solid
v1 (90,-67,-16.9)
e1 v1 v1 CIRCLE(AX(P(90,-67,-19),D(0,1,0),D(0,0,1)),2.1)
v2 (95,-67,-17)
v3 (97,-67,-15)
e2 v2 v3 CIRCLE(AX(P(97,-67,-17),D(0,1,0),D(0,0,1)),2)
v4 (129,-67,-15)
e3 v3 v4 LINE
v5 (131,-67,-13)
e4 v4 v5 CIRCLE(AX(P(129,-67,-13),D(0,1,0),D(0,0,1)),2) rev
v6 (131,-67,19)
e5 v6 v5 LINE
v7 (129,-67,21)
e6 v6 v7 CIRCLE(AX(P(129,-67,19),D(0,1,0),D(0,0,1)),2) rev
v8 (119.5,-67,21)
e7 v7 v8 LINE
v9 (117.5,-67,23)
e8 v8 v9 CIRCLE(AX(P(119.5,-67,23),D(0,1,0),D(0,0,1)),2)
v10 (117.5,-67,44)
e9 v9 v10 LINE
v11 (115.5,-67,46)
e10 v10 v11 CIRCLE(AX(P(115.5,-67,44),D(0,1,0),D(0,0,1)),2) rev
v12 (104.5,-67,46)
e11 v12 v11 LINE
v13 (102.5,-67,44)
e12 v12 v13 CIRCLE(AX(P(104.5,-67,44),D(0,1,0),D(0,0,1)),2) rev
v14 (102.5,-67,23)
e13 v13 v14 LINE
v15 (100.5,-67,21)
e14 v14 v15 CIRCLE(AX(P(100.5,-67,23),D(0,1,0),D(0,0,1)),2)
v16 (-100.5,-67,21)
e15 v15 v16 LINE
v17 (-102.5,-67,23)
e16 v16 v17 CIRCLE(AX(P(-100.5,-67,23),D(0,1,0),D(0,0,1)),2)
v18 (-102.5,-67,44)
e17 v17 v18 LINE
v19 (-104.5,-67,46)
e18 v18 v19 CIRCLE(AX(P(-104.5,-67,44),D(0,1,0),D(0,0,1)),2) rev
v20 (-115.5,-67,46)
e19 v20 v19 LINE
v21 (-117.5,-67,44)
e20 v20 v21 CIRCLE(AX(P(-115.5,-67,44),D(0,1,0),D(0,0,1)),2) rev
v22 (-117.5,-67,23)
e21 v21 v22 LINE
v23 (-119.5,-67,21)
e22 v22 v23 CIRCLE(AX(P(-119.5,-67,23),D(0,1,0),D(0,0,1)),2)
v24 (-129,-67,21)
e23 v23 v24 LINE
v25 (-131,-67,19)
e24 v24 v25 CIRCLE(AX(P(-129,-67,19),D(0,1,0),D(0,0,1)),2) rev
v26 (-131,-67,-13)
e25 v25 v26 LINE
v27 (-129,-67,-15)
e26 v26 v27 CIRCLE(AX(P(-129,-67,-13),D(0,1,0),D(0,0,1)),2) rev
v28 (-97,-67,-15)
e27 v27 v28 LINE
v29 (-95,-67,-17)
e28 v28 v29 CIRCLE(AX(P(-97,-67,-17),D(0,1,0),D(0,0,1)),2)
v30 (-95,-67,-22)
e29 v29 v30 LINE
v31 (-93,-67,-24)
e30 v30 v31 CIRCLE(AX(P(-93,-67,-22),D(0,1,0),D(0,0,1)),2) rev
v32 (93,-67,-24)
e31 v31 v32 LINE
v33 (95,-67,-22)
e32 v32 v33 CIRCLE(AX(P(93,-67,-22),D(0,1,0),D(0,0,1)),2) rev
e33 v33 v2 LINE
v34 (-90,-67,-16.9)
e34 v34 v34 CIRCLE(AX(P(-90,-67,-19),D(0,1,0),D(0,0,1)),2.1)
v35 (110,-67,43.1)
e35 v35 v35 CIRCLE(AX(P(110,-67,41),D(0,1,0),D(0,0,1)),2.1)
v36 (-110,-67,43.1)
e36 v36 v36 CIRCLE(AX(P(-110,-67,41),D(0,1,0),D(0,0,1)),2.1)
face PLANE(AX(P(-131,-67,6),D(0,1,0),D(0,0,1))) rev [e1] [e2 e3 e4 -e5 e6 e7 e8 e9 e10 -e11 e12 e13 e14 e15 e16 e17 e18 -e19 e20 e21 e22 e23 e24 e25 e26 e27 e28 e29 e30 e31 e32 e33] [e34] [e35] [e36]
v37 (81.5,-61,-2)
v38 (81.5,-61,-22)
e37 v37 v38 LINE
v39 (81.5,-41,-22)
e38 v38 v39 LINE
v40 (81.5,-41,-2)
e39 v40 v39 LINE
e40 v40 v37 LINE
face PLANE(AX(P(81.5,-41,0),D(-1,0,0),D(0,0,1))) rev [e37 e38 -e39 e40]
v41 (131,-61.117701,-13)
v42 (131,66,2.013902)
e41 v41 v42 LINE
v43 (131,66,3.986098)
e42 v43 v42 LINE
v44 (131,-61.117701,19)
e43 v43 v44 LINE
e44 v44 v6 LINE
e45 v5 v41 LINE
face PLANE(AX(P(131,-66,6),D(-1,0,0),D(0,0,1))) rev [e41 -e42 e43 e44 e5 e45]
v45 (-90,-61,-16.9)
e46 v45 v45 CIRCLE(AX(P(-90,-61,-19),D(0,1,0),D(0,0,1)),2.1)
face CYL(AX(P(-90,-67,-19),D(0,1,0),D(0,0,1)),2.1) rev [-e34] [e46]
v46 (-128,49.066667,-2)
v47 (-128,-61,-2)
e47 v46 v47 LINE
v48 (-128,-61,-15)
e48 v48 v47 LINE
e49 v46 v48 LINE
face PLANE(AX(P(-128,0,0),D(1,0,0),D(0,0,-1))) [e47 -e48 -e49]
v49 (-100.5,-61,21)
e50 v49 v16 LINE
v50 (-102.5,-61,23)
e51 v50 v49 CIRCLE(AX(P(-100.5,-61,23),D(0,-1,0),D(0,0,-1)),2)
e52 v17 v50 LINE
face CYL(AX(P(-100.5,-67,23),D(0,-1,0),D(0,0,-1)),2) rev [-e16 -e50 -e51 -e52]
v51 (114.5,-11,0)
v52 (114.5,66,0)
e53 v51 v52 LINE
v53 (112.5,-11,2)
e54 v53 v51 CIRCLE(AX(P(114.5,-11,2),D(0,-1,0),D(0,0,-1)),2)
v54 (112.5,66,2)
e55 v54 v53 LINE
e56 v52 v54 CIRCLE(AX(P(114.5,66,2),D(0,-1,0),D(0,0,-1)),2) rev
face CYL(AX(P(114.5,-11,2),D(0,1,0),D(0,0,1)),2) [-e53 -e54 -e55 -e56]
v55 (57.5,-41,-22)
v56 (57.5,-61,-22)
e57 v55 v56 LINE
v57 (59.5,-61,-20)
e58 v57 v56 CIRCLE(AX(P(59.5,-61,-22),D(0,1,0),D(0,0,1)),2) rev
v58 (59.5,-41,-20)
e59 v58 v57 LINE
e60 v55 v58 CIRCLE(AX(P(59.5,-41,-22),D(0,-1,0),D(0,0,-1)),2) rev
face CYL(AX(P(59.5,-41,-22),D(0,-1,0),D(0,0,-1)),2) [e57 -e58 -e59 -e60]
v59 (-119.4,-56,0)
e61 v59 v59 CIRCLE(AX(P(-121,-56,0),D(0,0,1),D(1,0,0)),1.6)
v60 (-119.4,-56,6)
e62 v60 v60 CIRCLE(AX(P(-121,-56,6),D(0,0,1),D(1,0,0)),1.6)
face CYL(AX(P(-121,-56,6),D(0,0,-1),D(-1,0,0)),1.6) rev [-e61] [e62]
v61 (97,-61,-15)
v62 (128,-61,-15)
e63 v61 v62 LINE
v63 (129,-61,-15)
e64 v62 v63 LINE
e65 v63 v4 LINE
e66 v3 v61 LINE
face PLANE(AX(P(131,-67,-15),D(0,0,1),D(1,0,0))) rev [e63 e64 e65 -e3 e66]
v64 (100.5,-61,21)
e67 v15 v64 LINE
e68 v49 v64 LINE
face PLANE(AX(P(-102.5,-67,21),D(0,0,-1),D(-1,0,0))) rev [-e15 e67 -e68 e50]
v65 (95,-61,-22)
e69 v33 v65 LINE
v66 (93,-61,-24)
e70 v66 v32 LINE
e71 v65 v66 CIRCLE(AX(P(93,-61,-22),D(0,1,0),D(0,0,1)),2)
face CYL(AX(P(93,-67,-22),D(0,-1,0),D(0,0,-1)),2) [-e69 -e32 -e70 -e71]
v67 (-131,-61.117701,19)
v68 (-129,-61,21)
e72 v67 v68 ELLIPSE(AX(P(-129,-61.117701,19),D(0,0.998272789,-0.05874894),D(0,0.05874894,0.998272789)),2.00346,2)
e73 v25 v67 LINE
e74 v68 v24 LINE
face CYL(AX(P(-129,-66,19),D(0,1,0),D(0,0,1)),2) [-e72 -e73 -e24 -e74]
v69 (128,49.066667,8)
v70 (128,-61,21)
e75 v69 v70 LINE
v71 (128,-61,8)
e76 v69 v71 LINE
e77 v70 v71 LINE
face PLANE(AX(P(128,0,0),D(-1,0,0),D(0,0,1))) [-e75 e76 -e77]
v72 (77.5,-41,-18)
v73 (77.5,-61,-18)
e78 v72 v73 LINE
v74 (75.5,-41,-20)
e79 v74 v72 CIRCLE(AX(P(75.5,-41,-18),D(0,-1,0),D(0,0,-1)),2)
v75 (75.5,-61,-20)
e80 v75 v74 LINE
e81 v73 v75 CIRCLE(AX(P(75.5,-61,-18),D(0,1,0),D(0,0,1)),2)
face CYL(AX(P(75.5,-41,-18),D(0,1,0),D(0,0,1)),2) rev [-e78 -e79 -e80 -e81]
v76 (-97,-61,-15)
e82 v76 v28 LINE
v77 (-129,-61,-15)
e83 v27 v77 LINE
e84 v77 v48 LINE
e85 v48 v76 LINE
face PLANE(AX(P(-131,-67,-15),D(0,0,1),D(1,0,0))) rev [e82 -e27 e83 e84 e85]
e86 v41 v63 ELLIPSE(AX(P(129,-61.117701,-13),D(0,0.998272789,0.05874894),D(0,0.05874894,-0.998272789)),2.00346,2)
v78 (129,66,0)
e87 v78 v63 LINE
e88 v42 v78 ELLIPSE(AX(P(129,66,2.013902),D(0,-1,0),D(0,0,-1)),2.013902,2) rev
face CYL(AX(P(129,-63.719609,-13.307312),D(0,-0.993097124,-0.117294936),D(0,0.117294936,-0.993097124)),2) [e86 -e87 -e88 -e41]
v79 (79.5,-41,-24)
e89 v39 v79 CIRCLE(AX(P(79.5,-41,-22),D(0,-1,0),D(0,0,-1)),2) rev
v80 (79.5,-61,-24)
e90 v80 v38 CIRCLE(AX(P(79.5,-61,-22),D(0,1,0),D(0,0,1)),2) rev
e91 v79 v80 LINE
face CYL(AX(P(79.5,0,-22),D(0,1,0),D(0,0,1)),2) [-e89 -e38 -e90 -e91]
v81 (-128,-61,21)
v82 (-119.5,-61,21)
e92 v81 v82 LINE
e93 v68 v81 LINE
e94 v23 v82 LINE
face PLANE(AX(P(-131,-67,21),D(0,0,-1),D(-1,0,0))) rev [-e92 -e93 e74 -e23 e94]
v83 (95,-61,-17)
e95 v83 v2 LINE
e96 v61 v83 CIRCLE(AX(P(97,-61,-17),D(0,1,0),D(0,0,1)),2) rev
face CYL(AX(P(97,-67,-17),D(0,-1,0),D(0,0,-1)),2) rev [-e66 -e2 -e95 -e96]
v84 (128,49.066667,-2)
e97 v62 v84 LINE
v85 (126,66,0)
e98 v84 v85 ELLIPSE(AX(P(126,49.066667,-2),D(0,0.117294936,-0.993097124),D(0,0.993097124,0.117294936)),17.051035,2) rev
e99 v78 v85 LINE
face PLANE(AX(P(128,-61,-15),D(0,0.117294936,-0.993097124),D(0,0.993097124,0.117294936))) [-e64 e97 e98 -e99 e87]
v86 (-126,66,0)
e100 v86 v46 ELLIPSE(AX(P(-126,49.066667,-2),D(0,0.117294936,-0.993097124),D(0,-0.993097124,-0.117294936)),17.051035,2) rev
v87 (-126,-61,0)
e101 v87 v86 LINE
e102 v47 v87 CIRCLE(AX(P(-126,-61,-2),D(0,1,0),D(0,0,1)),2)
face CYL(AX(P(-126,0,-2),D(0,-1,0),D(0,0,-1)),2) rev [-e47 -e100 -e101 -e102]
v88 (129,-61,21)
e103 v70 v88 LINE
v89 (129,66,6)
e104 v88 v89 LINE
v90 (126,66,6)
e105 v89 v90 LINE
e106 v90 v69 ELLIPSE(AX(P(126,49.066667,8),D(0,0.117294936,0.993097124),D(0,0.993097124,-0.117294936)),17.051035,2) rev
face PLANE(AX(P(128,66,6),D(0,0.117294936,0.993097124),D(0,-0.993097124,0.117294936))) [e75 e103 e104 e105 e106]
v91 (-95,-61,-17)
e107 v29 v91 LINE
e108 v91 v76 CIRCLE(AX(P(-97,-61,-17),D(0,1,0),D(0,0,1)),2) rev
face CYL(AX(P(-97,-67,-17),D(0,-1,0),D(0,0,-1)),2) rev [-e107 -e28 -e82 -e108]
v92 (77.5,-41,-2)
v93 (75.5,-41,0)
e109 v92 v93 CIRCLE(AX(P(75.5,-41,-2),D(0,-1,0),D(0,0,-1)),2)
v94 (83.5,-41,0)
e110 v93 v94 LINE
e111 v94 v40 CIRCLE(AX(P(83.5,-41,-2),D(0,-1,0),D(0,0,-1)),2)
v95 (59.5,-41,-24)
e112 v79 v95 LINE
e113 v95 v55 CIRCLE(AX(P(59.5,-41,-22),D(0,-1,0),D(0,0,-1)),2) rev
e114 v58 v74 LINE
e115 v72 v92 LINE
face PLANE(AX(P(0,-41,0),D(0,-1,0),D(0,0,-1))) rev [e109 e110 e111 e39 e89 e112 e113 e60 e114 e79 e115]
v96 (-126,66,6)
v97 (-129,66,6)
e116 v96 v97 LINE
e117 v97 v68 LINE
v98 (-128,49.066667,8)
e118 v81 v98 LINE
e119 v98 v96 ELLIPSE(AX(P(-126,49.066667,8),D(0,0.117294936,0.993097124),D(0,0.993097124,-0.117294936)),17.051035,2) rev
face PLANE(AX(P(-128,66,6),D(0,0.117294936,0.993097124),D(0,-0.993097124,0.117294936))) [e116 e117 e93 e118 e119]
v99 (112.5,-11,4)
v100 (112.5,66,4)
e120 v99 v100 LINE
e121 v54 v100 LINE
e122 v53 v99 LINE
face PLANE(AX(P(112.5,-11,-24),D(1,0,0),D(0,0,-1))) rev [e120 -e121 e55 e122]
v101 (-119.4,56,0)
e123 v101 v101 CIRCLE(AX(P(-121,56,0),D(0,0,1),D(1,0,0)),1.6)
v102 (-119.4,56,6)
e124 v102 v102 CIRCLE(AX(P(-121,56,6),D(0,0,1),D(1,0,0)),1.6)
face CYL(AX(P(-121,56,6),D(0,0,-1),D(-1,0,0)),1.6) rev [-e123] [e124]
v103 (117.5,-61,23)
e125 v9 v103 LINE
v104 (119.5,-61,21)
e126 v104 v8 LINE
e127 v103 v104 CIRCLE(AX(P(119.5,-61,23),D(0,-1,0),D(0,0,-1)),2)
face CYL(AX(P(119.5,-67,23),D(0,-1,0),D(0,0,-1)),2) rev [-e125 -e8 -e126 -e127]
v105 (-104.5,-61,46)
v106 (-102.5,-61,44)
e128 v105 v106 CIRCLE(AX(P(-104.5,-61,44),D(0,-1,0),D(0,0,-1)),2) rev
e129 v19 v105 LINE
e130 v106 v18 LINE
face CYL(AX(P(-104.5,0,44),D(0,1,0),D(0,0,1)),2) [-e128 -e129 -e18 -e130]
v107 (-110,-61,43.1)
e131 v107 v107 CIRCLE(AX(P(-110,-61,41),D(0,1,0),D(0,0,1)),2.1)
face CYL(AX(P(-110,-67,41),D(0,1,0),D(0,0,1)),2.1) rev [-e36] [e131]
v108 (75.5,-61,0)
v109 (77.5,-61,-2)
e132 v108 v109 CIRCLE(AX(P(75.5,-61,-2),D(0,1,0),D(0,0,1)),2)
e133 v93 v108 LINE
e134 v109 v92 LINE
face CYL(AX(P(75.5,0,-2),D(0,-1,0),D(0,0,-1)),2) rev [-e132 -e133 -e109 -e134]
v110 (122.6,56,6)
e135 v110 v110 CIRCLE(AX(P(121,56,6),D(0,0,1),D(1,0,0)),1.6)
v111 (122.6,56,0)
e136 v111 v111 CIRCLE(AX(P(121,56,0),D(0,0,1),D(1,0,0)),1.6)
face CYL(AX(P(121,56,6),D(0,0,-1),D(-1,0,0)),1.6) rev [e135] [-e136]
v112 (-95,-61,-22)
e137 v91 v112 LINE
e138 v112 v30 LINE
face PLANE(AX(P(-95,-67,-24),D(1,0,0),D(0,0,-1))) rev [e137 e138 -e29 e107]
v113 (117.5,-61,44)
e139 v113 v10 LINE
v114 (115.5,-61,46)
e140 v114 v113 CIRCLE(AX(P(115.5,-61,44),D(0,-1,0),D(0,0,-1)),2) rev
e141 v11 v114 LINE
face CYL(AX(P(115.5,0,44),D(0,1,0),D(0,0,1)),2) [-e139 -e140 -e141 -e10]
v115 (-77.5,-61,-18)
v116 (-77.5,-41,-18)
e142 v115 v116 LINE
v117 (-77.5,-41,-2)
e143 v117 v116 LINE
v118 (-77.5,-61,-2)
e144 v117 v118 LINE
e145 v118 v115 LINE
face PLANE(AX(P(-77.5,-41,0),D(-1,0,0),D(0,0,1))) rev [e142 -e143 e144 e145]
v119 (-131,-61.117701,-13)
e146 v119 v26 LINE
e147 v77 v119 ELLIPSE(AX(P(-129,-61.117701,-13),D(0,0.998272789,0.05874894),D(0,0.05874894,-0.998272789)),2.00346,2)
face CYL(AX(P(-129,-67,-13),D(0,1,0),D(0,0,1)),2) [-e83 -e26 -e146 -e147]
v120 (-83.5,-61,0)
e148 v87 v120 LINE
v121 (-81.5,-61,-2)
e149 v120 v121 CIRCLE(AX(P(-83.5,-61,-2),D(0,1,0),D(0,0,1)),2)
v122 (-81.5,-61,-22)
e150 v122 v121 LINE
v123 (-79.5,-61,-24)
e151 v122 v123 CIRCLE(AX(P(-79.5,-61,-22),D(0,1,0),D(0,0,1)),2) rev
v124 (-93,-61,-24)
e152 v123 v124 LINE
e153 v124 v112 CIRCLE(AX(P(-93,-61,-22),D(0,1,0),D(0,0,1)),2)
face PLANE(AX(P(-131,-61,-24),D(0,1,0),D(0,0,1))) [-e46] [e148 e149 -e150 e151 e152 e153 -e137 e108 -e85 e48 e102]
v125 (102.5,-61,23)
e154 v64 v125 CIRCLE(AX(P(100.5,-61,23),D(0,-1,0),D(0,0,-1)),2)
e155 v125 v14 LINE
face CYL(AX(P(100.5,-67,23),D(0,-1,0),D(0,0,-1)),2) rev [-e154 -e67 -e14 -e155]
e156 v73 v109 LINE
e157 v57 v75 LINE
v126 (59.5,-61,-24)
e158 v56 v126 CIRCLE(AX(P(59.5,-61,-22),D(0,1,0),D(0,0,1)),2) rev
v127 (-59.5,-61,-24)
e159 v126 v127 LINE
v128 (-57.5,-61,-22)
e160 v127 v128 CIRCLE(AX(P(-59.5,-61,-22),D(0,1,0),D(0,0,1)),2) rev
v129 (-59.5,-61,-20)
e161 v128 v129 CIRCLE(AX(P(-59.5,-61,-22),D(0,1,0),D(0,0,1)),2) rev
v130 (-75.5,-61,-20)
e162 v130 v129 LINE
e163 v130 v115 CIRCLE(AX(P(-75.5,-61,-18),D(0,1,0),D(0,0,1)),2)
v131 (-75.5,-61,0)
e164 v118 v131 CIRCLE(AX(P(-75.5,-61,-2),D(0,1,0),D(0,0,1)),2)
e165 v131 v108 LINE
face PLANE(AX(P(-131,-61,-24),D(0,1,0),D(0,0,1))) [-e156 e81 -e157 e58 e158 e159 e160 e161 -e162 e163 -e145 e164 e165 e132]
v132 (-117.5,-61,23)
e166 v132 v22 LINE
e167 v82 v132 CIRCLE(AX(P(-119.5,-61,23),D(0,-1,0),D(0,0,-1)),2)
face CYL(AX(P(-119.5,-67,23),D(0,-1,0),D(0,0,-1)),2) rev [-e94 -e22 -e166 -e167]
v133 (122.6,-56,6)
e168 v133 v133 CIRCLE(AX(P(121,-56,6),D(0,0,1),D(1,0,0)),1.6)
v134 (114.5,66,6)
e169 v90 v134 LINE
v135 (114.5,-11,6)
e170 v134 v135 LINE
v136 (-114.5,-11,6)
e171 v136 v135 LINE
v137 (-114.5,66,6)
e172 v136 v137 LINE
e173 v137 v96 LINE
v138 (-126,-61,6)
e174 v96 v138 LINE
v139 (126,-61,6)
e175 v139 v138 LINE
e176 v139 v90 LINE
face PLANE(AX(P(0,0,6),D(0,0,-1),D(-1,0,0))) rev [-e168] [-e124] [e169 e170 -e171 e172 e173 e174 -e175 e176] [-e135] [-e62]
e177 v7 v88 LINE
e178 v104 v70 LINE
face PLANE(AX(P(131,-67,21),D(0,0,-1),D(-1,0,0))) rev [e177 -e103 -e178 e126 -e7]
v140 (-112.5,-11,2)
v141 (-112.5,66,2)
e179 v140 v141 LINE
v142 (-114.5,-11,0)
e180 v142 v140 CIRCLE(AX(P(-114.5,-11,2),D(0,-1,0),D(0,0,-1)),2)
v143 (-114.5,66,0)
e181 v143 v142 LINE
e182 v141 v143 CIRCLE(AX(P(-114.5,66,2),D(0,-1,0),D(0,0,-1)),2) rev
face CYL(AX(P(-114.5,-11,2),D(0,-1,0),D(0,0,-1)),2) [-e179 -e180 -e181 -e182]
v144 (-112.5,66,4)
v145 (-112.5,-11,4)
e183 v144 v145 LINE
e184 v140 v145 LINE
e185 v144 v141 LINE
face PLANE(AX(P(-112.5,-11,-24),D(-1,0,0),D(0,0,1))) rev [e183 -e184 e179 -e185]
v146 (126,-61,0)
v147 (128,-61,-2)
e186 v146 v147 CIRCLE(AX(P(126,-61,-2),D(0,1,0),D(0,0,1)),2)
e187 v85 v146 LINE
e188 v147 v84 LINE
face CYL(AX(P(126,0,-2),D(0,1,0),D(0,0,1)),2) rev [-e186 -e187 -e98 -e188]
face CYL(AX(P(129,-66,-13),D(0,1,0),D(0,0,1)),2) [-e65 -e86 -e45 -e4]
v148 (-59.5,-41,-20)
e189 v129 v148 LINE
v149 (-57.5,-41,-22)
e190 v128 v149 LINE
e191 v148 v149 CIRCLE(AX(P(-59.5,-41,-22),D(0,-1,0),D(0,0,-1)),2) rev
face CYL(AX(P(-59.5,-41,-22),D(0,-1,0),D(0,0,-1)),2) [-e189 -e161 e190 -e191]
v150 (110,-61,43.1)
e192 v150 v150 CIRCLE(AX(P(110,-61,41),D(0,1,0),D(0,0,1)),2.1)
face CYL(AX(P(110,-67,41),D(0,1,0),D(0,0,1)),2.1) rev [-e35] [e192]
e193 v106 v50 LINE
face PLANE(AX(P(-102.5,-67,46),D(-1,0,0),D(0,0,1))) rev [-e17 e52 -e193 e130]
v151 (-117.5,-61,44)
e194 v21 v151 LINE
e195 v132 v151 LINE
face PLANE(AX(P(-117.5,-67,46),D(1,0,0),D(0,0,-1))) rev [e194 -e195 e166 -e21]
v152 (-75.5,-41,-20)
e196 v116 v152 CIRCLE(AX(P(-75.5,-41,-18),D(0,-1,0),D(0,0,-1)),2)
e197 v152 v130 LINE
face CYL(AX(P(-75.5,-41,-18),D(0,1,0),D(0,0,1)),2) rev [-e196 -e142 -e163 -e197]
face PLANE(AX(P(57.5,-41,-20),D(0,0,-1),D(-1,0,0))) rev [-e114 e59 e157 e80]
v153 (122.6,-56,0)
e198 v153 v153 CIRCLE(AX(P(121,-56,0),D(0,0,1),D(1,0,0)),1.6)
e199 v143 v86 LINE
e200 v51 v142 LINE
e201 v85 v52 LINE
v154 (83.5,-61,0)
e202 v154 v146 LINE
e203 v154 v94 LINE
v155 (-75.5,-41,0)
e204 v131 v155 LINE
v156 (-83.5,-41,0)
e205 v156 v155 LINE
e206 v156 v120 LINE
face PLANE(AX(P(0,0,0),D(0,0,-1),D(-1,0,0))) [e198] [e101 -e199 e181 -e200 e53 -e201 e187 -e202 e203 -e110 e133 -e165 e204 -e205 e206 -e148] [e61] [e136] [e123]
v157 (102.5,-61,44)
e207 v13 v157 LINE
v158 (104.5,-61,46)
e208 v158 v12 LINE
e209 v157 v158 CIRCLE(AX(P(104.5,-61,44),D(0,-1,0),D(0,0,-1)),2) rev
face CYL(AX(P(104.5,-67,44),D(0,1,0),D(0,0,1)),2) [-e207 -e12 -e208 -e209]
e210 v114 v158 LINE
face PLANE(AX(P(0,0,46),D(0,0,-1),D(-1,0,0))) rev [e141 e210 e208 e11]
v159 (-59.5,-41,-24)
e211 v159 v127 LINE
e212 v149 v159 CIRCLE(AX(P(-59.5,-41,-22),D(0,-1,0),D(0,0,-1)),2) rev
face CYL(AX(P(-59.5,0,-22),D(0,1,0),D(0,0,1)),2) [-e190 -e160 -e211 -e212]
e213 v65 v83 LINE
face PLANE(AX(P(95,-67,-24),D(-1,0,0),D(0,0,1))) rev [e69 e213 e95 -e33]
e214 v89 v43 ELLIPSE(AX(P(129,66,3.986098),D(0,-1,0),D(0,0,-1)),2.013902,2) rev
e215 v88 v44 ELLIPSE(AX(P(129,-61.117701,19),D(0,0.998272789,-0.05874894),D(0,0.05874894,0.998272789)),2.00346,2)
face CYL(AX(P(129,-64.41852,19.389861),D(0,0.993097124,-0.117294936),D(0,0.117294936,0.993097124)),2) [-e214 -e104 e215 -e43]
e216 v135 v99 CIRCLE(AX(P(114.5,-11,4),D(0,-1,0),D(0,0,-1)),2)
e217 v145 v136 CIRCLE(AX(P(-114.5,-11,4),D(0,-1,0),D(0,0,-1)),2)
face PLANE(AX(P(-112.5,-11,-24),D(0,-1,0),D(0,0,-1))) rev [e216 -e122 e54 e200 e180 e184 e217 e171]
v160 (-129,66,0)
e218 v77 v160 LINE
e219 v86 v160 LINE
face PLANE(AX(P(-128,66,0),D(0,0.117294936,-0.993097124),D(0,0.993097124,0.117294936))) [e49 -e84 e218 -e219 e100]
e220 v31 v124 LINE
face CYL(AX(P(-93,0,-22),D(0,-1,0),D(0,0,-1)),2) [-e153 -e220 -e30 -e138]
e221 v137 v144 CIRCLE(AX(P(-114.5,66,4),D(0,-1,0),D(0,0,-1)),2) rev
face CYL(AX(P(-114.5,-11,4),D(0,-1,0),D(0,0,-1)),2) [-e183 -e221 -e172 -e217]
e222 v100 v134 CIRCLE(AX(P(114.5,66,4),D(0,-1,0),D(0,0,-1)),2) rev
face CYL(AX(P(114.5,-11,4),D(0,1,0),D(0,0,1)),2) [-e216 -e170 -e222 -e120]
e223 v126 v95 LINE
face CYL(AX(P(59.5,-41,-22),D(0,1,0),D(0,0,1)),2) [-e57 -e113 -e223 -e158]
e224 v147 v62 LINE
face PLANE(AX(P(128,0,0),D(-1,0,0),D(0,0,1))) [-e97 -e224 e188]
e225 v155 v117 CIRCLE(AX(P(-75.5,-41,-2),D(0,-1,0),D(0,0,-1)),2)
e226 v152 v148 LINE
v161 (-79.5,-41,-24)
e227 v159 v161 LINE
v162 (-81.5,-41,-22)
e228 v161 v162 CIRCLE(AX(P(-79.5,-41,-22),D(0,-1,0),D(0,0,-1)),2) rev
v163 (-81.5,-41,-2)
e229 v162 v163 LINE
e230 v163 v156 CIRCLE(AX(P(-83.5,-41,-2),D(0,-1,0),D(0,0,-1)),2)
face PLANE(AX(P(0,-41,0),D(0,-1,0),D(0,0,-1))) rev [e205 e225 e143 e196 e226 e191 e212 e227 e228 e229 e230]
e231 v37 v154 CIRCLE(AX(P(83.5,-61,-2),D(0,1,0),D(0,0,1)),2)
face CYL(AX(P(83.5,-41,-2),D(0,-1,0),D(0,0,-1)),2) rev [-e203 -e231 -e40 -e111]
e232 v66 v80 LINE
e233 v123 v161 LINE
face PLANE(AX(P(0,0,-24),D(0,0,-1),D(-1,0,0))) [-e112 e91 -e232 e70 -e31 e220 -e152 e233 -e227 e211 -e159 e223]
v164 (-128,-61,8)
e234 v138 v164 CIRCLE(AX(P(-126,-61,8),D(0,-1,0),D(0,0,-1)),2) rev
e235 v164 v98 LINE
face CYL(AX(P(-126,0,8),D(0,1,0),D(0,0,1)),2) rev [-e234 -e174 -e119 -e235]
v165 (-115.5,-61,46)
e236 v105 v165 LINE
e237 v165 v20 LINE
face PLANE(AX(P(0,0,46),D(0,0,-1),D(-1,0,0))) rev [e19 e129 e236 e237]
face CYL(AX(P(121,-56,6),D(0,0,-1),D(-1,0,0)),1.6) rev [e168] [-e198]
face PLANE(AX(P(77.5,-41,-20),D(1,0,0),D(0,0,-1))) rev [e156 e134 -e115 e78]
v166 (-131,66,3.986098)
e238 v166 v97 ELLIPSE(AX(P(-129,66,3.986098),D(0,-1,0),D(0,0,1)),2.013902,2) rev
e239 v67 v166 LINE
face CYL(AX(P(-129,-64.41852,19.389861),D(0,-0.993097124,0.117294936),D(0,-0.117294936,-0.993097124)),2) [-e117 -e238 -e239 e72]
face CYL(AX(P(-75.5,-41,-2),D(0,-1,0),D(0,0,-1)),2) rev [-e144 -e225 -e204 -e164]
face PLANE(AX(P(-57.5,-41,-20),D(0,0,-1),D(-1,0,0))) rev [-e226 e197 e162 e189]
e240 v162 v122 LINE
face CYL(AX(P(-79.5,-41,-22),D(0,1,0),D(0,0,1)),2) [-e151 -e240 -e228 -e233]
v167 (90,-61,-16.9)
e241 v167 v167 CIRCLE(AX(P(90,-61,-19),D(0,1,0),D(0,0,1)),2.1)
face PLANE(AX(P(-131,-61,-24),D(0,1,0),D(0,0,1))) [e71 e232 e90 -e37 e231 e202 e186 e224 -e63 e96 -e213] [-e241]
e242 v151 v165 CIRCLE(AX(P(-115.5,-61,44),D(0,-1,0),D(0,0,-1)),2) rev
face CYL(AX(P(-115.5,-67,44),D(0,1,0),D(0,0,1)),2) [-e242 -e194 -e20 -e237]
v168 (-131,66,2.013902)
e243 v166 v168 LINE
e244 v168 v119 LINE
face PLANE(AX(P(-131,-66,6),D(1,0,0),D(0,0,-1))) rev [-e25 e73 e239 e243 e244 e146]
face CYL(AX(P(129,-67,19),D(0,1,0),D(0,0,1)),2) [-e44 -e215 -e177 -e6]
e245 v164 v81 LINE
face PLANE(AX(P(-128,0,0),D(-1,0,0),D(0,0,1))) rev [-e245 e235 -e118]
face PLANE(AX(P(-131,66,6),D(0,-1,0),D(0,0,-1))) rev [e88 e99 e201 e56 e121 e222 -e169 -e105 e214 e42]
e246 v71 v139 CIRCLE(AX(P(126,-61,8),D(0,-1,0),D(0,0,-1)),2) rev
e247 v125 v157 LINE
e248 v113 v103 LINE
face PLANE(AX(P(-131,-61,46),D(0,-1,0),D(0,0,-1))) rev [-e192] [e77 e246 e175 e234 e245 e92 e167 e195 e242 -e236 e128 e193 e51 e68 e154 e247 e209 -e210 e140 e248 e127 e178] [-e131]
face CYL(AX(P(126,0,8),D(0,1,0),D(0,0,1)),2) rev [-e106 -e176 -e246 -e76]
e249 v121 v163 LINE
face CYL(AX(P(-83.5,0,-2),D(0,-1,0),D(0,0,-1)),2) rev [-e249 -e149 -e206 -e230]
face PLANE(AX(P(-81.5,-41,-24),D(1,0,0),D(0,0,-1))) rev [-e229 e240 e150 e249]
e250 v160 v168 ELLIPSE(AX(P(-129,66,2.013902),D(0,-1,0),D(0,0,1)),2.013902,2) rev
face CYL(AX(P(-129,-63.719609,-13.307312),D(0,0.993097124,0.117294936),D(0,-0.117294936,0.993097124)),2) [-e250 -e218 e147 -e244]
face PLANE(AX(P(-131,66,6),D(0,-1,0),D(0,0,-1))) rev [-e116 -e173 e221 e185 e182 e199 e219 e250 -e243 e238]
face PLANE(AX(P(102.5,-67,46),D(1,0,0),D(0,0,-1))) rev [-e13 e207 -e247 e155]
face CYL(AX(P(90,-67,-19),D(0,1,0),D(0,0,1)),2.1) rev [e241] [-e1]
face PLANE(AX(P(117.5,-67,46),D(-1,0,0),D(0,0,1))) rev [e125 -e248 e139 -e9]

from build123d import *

# Parameters (mm, degrees)
SKETCH1_R               = 1.6
BOSS_EXTRUDE1_DEPTH     = 6
SKETCH5_W               = 262
SKETCH5_H               = 6
BOSS_EXTRUDE3_DEPTH     = 40
SKETCH5_2_W             = 262
SKETCH5_2_H             = 6
BOSS_EXTRUDE5_DEPTH     = 30
SKETCH3_R               = 2.1
CUT_EXTRUDE1_DEPTH      = 189.164821367
SKETCH6_W               = 225
SKETCH6_H               = 77
CUT_EXTRUDE2_DEPTH      = 153.47950682
BOSS_EXTRUDE7_DEPTH     = 20
CUT_EXTRUDE4_DEPTH      = 189.164821367
CUT_EXTRUDE4_DEPTH_BACK = 189.164821367
SKETCH11_W              = 36
SKETCH11_H              = 9
SKETCH11_W_2            = 13.5
SKETCH11_H_2            = 25
SKETCH11_W_3            = 205
BOSS_EXTRUDE4_DEPTH     = 3
BOSS_EXTRUDE6_DEPTH     = 3
FILLET1_R               = 2


with BuildPart() as part:
    # Sketch1 → Boss-Extrude1 (new body)
    with BuildSketch(Plane.XY):
        Polygon((-131, -66), (-131, 66), (131, 66), (131, -66), (131, -67), (-131, -67), align=None)
        with Locations((-121, 56)):
            Circle(SKETCH1_R, mode=Mode.SUBTRACT)
        with Locations((121, 56)):
            Circle(SKETCH1_R, mode=Mode.SUBTRACT)
        with Locations((121, -56)):
            Circle(SKETCH1_R, mode=Mode.SUBTRACT)
        with Locations((-121, -56)):
            Circle(SKETCH1_R, mode=Mode.SUBTRACT)
    extrude(amount=BOSS_EXTRUDE1_DEPTH)

    # Sketch5 → Boss-Extrude3 (add)
    with BuildSketch(Plane.XY.offset(6)):
        with Locations((0, -64)):
            Rectangle(SKETCH5_W, SKETCH5_H)
    extrude(amount=BOSS_EXTRUDE3_DEPTH)

    # Sketch5<2> → Boss-Extrude5 (add)
    with BuildSketch(Plane.XY.offset(6)):
        with Locations((0, -64)):
            Rectangle(SKETCH5_2_W, SKETCH5_2_H)
    extrude(amount=-BOSS_EXTRUDE5_DEPTH)

    # Sketch3 → Cut-Extrude1 (cut, through all)
    with BuildSketch(Plane(origin=(0, -61, 0), x_dir=(1, 0, 0), z_dir=(0, 1, 0))):
        with Locations(Location((-110, -41, 0), (0, 0, 270))):
            Circle(SKETCH3_R)
        with Locations(Location((110, -41, 0), (0, 0, 270))):
            Circle(SKETCH3_R)
        with Locations(Location((-90, 19, 0), (0, 0, 270))):
            Circle(SKETCH3_R)
        with Locations(Location((90, 19, 0), (0, 0, 270))):
            Circle(SKETCH3_R)
    extrude(amount=-CUT_EXTRUDE1_DEPTH, mode=Mode.SUBTRACT)

    # Sketch6 → Cut-Extrude2 (cut, through all)
    with BuildSketch(Plane.XY.offset(6)):
        with Locations((0, 27.5)):
            Rectangle(SKETCH6_W, SKETCH6_H)
    extrude(amount=-CUT_EXTRUDE2_DEPTH, mode=Mode.SUBTRACT)

    # Sketch9 → Boss-Extrude7 (add)
    with BuildSketch(Plane(origin=(0, -61, 0), x_dir=(1, 0, 0), z_dir=(0, 1, 0))):
        Polygon((-81.5, 24), (-81.5, 0), (-77.5, 0), (-77.5, 20), (-57.5, 20), (-57.5, 24), align=None)
        Polygon((77.5, 20), (77.5, 0), (81.5, 0), (81.5, 24), (57.5, 24), (57.5, 20), align=None)
    extrude(amount=BOSS_EXTRUDE7_DEPTH)

    # Sketch11 → Cut-Extrude4 (cut, two sides: drawn at the far end of the back side and taken through both)
    with BuildSketch(Plane(origin=(0, -61, 0), x_dir=(1, 0, 0), z_dir=(0, 1, 0)).offset(-CUT_EXTRUDE4_DEPTH_BACK)):
        with Locations((-113, 19.5)):
            Rectangle(SKETCH11_W, SKETCH11_H)
        with Locations((113, 19.5)):
            Rectangle(SKETCH11_W, SKETCH11_H)
        with Locations((124.25, -33.5)):
            Rectangle(SKETCH11_W_2, SKETCH11_H_2)
        with Locations((-124.25, -33.5)):
            Rectangle(SKETCH11_W_2, SKETCH11_H_2)
        with Locations((0, -33.5)):
            Rectangle(SKETCH11_W_3, SKETCH11_H_2)
    extrude(amount=CUT_EXTRUDE4_DEPTH + CUT_EXTRUDE4_DEPTH_BACK, mode=Mode.SUBTRACT)

    # Sketch8 → Boss-Extrude4 (add)
    with BuildSketch(Plane(origin=(131, 0, 0), x_dir=(0, 0, -1), z_dir=(1, 0, 0))):
        Polygon((-6, 66), (-21, -61), (-6, -61), align=None)
        Polygon((0, 66), (0, -61), (15, -61), align=None)
    extrude(amount=-BOSS_EXTRUDE4_DEPTH)

    # Sketch7 → Boss-Extrude6 (add)
    with BuildSketch(Plane.ZY.offset(131)):
        Polygon((6, 66), (21, -61), (6, -61), align=None)
        Polygon((0, 66), (-15, -61), (0, -61), align=None)
    extrude(amount=-BOSS_EXTRUDE6_DEPTH)

    # Fillet1
    fillet1_edges = [part.edges().sort_by_distance(p)[0] for p in [
        (128, 2.5, 6),
        (128, 2.5, 0),
        (-128, 2.5, 0),
        (-131, 2.5, -7.5),
        (-131, 2.5, 13.5),
        (-128, 2.5, 6),
        (131, 2.5, -7.5),
        (131, 2.5, 13.5),
        (-112.5, 27.5, 6),
        (-112.5, 27.5, 0),
        (112.5, 27.5, 6),
        (112.5, 27.5, 0),
        (-131, -64, -15),
        (-95, -64, -15),
        (-95, -64, -24),
        (-81.5, -51, 0),
        (81.5, -51, 0),
        (95, -64, -24),
        (95, -64, -15),
        (131, -64, -15),
        (-131, -64, 21),
        (-117.5, -64, 21),
        (102.5, -64, 21),
        (131, -64, 21),
        (-102.5, -64, 21),
        (117.5, -64, 21),
        (102.5, -64, 46),
        (117.5, -64, 46),
        (-117.5, -64, 46),
        (-102.5, -64, 46),
        (77.5, -51, 0),
        (-77.5, -51, 0),
        (-77.5, -51, -20),
        (77.5, -51, -20),
        (57.5, -51, -20),
        (-57.5, -51, -20),
        (-81.5, -51, -24),
        (-57.5, -51, -24),
        (57.5, -51, -24),
        (81.5, -51, -24),
    ]]
    fillet(fillet1_edges, radius=FILLET1_R - 0.0001)  # a hair under: the kernel refuses the full size


solid = part.part
